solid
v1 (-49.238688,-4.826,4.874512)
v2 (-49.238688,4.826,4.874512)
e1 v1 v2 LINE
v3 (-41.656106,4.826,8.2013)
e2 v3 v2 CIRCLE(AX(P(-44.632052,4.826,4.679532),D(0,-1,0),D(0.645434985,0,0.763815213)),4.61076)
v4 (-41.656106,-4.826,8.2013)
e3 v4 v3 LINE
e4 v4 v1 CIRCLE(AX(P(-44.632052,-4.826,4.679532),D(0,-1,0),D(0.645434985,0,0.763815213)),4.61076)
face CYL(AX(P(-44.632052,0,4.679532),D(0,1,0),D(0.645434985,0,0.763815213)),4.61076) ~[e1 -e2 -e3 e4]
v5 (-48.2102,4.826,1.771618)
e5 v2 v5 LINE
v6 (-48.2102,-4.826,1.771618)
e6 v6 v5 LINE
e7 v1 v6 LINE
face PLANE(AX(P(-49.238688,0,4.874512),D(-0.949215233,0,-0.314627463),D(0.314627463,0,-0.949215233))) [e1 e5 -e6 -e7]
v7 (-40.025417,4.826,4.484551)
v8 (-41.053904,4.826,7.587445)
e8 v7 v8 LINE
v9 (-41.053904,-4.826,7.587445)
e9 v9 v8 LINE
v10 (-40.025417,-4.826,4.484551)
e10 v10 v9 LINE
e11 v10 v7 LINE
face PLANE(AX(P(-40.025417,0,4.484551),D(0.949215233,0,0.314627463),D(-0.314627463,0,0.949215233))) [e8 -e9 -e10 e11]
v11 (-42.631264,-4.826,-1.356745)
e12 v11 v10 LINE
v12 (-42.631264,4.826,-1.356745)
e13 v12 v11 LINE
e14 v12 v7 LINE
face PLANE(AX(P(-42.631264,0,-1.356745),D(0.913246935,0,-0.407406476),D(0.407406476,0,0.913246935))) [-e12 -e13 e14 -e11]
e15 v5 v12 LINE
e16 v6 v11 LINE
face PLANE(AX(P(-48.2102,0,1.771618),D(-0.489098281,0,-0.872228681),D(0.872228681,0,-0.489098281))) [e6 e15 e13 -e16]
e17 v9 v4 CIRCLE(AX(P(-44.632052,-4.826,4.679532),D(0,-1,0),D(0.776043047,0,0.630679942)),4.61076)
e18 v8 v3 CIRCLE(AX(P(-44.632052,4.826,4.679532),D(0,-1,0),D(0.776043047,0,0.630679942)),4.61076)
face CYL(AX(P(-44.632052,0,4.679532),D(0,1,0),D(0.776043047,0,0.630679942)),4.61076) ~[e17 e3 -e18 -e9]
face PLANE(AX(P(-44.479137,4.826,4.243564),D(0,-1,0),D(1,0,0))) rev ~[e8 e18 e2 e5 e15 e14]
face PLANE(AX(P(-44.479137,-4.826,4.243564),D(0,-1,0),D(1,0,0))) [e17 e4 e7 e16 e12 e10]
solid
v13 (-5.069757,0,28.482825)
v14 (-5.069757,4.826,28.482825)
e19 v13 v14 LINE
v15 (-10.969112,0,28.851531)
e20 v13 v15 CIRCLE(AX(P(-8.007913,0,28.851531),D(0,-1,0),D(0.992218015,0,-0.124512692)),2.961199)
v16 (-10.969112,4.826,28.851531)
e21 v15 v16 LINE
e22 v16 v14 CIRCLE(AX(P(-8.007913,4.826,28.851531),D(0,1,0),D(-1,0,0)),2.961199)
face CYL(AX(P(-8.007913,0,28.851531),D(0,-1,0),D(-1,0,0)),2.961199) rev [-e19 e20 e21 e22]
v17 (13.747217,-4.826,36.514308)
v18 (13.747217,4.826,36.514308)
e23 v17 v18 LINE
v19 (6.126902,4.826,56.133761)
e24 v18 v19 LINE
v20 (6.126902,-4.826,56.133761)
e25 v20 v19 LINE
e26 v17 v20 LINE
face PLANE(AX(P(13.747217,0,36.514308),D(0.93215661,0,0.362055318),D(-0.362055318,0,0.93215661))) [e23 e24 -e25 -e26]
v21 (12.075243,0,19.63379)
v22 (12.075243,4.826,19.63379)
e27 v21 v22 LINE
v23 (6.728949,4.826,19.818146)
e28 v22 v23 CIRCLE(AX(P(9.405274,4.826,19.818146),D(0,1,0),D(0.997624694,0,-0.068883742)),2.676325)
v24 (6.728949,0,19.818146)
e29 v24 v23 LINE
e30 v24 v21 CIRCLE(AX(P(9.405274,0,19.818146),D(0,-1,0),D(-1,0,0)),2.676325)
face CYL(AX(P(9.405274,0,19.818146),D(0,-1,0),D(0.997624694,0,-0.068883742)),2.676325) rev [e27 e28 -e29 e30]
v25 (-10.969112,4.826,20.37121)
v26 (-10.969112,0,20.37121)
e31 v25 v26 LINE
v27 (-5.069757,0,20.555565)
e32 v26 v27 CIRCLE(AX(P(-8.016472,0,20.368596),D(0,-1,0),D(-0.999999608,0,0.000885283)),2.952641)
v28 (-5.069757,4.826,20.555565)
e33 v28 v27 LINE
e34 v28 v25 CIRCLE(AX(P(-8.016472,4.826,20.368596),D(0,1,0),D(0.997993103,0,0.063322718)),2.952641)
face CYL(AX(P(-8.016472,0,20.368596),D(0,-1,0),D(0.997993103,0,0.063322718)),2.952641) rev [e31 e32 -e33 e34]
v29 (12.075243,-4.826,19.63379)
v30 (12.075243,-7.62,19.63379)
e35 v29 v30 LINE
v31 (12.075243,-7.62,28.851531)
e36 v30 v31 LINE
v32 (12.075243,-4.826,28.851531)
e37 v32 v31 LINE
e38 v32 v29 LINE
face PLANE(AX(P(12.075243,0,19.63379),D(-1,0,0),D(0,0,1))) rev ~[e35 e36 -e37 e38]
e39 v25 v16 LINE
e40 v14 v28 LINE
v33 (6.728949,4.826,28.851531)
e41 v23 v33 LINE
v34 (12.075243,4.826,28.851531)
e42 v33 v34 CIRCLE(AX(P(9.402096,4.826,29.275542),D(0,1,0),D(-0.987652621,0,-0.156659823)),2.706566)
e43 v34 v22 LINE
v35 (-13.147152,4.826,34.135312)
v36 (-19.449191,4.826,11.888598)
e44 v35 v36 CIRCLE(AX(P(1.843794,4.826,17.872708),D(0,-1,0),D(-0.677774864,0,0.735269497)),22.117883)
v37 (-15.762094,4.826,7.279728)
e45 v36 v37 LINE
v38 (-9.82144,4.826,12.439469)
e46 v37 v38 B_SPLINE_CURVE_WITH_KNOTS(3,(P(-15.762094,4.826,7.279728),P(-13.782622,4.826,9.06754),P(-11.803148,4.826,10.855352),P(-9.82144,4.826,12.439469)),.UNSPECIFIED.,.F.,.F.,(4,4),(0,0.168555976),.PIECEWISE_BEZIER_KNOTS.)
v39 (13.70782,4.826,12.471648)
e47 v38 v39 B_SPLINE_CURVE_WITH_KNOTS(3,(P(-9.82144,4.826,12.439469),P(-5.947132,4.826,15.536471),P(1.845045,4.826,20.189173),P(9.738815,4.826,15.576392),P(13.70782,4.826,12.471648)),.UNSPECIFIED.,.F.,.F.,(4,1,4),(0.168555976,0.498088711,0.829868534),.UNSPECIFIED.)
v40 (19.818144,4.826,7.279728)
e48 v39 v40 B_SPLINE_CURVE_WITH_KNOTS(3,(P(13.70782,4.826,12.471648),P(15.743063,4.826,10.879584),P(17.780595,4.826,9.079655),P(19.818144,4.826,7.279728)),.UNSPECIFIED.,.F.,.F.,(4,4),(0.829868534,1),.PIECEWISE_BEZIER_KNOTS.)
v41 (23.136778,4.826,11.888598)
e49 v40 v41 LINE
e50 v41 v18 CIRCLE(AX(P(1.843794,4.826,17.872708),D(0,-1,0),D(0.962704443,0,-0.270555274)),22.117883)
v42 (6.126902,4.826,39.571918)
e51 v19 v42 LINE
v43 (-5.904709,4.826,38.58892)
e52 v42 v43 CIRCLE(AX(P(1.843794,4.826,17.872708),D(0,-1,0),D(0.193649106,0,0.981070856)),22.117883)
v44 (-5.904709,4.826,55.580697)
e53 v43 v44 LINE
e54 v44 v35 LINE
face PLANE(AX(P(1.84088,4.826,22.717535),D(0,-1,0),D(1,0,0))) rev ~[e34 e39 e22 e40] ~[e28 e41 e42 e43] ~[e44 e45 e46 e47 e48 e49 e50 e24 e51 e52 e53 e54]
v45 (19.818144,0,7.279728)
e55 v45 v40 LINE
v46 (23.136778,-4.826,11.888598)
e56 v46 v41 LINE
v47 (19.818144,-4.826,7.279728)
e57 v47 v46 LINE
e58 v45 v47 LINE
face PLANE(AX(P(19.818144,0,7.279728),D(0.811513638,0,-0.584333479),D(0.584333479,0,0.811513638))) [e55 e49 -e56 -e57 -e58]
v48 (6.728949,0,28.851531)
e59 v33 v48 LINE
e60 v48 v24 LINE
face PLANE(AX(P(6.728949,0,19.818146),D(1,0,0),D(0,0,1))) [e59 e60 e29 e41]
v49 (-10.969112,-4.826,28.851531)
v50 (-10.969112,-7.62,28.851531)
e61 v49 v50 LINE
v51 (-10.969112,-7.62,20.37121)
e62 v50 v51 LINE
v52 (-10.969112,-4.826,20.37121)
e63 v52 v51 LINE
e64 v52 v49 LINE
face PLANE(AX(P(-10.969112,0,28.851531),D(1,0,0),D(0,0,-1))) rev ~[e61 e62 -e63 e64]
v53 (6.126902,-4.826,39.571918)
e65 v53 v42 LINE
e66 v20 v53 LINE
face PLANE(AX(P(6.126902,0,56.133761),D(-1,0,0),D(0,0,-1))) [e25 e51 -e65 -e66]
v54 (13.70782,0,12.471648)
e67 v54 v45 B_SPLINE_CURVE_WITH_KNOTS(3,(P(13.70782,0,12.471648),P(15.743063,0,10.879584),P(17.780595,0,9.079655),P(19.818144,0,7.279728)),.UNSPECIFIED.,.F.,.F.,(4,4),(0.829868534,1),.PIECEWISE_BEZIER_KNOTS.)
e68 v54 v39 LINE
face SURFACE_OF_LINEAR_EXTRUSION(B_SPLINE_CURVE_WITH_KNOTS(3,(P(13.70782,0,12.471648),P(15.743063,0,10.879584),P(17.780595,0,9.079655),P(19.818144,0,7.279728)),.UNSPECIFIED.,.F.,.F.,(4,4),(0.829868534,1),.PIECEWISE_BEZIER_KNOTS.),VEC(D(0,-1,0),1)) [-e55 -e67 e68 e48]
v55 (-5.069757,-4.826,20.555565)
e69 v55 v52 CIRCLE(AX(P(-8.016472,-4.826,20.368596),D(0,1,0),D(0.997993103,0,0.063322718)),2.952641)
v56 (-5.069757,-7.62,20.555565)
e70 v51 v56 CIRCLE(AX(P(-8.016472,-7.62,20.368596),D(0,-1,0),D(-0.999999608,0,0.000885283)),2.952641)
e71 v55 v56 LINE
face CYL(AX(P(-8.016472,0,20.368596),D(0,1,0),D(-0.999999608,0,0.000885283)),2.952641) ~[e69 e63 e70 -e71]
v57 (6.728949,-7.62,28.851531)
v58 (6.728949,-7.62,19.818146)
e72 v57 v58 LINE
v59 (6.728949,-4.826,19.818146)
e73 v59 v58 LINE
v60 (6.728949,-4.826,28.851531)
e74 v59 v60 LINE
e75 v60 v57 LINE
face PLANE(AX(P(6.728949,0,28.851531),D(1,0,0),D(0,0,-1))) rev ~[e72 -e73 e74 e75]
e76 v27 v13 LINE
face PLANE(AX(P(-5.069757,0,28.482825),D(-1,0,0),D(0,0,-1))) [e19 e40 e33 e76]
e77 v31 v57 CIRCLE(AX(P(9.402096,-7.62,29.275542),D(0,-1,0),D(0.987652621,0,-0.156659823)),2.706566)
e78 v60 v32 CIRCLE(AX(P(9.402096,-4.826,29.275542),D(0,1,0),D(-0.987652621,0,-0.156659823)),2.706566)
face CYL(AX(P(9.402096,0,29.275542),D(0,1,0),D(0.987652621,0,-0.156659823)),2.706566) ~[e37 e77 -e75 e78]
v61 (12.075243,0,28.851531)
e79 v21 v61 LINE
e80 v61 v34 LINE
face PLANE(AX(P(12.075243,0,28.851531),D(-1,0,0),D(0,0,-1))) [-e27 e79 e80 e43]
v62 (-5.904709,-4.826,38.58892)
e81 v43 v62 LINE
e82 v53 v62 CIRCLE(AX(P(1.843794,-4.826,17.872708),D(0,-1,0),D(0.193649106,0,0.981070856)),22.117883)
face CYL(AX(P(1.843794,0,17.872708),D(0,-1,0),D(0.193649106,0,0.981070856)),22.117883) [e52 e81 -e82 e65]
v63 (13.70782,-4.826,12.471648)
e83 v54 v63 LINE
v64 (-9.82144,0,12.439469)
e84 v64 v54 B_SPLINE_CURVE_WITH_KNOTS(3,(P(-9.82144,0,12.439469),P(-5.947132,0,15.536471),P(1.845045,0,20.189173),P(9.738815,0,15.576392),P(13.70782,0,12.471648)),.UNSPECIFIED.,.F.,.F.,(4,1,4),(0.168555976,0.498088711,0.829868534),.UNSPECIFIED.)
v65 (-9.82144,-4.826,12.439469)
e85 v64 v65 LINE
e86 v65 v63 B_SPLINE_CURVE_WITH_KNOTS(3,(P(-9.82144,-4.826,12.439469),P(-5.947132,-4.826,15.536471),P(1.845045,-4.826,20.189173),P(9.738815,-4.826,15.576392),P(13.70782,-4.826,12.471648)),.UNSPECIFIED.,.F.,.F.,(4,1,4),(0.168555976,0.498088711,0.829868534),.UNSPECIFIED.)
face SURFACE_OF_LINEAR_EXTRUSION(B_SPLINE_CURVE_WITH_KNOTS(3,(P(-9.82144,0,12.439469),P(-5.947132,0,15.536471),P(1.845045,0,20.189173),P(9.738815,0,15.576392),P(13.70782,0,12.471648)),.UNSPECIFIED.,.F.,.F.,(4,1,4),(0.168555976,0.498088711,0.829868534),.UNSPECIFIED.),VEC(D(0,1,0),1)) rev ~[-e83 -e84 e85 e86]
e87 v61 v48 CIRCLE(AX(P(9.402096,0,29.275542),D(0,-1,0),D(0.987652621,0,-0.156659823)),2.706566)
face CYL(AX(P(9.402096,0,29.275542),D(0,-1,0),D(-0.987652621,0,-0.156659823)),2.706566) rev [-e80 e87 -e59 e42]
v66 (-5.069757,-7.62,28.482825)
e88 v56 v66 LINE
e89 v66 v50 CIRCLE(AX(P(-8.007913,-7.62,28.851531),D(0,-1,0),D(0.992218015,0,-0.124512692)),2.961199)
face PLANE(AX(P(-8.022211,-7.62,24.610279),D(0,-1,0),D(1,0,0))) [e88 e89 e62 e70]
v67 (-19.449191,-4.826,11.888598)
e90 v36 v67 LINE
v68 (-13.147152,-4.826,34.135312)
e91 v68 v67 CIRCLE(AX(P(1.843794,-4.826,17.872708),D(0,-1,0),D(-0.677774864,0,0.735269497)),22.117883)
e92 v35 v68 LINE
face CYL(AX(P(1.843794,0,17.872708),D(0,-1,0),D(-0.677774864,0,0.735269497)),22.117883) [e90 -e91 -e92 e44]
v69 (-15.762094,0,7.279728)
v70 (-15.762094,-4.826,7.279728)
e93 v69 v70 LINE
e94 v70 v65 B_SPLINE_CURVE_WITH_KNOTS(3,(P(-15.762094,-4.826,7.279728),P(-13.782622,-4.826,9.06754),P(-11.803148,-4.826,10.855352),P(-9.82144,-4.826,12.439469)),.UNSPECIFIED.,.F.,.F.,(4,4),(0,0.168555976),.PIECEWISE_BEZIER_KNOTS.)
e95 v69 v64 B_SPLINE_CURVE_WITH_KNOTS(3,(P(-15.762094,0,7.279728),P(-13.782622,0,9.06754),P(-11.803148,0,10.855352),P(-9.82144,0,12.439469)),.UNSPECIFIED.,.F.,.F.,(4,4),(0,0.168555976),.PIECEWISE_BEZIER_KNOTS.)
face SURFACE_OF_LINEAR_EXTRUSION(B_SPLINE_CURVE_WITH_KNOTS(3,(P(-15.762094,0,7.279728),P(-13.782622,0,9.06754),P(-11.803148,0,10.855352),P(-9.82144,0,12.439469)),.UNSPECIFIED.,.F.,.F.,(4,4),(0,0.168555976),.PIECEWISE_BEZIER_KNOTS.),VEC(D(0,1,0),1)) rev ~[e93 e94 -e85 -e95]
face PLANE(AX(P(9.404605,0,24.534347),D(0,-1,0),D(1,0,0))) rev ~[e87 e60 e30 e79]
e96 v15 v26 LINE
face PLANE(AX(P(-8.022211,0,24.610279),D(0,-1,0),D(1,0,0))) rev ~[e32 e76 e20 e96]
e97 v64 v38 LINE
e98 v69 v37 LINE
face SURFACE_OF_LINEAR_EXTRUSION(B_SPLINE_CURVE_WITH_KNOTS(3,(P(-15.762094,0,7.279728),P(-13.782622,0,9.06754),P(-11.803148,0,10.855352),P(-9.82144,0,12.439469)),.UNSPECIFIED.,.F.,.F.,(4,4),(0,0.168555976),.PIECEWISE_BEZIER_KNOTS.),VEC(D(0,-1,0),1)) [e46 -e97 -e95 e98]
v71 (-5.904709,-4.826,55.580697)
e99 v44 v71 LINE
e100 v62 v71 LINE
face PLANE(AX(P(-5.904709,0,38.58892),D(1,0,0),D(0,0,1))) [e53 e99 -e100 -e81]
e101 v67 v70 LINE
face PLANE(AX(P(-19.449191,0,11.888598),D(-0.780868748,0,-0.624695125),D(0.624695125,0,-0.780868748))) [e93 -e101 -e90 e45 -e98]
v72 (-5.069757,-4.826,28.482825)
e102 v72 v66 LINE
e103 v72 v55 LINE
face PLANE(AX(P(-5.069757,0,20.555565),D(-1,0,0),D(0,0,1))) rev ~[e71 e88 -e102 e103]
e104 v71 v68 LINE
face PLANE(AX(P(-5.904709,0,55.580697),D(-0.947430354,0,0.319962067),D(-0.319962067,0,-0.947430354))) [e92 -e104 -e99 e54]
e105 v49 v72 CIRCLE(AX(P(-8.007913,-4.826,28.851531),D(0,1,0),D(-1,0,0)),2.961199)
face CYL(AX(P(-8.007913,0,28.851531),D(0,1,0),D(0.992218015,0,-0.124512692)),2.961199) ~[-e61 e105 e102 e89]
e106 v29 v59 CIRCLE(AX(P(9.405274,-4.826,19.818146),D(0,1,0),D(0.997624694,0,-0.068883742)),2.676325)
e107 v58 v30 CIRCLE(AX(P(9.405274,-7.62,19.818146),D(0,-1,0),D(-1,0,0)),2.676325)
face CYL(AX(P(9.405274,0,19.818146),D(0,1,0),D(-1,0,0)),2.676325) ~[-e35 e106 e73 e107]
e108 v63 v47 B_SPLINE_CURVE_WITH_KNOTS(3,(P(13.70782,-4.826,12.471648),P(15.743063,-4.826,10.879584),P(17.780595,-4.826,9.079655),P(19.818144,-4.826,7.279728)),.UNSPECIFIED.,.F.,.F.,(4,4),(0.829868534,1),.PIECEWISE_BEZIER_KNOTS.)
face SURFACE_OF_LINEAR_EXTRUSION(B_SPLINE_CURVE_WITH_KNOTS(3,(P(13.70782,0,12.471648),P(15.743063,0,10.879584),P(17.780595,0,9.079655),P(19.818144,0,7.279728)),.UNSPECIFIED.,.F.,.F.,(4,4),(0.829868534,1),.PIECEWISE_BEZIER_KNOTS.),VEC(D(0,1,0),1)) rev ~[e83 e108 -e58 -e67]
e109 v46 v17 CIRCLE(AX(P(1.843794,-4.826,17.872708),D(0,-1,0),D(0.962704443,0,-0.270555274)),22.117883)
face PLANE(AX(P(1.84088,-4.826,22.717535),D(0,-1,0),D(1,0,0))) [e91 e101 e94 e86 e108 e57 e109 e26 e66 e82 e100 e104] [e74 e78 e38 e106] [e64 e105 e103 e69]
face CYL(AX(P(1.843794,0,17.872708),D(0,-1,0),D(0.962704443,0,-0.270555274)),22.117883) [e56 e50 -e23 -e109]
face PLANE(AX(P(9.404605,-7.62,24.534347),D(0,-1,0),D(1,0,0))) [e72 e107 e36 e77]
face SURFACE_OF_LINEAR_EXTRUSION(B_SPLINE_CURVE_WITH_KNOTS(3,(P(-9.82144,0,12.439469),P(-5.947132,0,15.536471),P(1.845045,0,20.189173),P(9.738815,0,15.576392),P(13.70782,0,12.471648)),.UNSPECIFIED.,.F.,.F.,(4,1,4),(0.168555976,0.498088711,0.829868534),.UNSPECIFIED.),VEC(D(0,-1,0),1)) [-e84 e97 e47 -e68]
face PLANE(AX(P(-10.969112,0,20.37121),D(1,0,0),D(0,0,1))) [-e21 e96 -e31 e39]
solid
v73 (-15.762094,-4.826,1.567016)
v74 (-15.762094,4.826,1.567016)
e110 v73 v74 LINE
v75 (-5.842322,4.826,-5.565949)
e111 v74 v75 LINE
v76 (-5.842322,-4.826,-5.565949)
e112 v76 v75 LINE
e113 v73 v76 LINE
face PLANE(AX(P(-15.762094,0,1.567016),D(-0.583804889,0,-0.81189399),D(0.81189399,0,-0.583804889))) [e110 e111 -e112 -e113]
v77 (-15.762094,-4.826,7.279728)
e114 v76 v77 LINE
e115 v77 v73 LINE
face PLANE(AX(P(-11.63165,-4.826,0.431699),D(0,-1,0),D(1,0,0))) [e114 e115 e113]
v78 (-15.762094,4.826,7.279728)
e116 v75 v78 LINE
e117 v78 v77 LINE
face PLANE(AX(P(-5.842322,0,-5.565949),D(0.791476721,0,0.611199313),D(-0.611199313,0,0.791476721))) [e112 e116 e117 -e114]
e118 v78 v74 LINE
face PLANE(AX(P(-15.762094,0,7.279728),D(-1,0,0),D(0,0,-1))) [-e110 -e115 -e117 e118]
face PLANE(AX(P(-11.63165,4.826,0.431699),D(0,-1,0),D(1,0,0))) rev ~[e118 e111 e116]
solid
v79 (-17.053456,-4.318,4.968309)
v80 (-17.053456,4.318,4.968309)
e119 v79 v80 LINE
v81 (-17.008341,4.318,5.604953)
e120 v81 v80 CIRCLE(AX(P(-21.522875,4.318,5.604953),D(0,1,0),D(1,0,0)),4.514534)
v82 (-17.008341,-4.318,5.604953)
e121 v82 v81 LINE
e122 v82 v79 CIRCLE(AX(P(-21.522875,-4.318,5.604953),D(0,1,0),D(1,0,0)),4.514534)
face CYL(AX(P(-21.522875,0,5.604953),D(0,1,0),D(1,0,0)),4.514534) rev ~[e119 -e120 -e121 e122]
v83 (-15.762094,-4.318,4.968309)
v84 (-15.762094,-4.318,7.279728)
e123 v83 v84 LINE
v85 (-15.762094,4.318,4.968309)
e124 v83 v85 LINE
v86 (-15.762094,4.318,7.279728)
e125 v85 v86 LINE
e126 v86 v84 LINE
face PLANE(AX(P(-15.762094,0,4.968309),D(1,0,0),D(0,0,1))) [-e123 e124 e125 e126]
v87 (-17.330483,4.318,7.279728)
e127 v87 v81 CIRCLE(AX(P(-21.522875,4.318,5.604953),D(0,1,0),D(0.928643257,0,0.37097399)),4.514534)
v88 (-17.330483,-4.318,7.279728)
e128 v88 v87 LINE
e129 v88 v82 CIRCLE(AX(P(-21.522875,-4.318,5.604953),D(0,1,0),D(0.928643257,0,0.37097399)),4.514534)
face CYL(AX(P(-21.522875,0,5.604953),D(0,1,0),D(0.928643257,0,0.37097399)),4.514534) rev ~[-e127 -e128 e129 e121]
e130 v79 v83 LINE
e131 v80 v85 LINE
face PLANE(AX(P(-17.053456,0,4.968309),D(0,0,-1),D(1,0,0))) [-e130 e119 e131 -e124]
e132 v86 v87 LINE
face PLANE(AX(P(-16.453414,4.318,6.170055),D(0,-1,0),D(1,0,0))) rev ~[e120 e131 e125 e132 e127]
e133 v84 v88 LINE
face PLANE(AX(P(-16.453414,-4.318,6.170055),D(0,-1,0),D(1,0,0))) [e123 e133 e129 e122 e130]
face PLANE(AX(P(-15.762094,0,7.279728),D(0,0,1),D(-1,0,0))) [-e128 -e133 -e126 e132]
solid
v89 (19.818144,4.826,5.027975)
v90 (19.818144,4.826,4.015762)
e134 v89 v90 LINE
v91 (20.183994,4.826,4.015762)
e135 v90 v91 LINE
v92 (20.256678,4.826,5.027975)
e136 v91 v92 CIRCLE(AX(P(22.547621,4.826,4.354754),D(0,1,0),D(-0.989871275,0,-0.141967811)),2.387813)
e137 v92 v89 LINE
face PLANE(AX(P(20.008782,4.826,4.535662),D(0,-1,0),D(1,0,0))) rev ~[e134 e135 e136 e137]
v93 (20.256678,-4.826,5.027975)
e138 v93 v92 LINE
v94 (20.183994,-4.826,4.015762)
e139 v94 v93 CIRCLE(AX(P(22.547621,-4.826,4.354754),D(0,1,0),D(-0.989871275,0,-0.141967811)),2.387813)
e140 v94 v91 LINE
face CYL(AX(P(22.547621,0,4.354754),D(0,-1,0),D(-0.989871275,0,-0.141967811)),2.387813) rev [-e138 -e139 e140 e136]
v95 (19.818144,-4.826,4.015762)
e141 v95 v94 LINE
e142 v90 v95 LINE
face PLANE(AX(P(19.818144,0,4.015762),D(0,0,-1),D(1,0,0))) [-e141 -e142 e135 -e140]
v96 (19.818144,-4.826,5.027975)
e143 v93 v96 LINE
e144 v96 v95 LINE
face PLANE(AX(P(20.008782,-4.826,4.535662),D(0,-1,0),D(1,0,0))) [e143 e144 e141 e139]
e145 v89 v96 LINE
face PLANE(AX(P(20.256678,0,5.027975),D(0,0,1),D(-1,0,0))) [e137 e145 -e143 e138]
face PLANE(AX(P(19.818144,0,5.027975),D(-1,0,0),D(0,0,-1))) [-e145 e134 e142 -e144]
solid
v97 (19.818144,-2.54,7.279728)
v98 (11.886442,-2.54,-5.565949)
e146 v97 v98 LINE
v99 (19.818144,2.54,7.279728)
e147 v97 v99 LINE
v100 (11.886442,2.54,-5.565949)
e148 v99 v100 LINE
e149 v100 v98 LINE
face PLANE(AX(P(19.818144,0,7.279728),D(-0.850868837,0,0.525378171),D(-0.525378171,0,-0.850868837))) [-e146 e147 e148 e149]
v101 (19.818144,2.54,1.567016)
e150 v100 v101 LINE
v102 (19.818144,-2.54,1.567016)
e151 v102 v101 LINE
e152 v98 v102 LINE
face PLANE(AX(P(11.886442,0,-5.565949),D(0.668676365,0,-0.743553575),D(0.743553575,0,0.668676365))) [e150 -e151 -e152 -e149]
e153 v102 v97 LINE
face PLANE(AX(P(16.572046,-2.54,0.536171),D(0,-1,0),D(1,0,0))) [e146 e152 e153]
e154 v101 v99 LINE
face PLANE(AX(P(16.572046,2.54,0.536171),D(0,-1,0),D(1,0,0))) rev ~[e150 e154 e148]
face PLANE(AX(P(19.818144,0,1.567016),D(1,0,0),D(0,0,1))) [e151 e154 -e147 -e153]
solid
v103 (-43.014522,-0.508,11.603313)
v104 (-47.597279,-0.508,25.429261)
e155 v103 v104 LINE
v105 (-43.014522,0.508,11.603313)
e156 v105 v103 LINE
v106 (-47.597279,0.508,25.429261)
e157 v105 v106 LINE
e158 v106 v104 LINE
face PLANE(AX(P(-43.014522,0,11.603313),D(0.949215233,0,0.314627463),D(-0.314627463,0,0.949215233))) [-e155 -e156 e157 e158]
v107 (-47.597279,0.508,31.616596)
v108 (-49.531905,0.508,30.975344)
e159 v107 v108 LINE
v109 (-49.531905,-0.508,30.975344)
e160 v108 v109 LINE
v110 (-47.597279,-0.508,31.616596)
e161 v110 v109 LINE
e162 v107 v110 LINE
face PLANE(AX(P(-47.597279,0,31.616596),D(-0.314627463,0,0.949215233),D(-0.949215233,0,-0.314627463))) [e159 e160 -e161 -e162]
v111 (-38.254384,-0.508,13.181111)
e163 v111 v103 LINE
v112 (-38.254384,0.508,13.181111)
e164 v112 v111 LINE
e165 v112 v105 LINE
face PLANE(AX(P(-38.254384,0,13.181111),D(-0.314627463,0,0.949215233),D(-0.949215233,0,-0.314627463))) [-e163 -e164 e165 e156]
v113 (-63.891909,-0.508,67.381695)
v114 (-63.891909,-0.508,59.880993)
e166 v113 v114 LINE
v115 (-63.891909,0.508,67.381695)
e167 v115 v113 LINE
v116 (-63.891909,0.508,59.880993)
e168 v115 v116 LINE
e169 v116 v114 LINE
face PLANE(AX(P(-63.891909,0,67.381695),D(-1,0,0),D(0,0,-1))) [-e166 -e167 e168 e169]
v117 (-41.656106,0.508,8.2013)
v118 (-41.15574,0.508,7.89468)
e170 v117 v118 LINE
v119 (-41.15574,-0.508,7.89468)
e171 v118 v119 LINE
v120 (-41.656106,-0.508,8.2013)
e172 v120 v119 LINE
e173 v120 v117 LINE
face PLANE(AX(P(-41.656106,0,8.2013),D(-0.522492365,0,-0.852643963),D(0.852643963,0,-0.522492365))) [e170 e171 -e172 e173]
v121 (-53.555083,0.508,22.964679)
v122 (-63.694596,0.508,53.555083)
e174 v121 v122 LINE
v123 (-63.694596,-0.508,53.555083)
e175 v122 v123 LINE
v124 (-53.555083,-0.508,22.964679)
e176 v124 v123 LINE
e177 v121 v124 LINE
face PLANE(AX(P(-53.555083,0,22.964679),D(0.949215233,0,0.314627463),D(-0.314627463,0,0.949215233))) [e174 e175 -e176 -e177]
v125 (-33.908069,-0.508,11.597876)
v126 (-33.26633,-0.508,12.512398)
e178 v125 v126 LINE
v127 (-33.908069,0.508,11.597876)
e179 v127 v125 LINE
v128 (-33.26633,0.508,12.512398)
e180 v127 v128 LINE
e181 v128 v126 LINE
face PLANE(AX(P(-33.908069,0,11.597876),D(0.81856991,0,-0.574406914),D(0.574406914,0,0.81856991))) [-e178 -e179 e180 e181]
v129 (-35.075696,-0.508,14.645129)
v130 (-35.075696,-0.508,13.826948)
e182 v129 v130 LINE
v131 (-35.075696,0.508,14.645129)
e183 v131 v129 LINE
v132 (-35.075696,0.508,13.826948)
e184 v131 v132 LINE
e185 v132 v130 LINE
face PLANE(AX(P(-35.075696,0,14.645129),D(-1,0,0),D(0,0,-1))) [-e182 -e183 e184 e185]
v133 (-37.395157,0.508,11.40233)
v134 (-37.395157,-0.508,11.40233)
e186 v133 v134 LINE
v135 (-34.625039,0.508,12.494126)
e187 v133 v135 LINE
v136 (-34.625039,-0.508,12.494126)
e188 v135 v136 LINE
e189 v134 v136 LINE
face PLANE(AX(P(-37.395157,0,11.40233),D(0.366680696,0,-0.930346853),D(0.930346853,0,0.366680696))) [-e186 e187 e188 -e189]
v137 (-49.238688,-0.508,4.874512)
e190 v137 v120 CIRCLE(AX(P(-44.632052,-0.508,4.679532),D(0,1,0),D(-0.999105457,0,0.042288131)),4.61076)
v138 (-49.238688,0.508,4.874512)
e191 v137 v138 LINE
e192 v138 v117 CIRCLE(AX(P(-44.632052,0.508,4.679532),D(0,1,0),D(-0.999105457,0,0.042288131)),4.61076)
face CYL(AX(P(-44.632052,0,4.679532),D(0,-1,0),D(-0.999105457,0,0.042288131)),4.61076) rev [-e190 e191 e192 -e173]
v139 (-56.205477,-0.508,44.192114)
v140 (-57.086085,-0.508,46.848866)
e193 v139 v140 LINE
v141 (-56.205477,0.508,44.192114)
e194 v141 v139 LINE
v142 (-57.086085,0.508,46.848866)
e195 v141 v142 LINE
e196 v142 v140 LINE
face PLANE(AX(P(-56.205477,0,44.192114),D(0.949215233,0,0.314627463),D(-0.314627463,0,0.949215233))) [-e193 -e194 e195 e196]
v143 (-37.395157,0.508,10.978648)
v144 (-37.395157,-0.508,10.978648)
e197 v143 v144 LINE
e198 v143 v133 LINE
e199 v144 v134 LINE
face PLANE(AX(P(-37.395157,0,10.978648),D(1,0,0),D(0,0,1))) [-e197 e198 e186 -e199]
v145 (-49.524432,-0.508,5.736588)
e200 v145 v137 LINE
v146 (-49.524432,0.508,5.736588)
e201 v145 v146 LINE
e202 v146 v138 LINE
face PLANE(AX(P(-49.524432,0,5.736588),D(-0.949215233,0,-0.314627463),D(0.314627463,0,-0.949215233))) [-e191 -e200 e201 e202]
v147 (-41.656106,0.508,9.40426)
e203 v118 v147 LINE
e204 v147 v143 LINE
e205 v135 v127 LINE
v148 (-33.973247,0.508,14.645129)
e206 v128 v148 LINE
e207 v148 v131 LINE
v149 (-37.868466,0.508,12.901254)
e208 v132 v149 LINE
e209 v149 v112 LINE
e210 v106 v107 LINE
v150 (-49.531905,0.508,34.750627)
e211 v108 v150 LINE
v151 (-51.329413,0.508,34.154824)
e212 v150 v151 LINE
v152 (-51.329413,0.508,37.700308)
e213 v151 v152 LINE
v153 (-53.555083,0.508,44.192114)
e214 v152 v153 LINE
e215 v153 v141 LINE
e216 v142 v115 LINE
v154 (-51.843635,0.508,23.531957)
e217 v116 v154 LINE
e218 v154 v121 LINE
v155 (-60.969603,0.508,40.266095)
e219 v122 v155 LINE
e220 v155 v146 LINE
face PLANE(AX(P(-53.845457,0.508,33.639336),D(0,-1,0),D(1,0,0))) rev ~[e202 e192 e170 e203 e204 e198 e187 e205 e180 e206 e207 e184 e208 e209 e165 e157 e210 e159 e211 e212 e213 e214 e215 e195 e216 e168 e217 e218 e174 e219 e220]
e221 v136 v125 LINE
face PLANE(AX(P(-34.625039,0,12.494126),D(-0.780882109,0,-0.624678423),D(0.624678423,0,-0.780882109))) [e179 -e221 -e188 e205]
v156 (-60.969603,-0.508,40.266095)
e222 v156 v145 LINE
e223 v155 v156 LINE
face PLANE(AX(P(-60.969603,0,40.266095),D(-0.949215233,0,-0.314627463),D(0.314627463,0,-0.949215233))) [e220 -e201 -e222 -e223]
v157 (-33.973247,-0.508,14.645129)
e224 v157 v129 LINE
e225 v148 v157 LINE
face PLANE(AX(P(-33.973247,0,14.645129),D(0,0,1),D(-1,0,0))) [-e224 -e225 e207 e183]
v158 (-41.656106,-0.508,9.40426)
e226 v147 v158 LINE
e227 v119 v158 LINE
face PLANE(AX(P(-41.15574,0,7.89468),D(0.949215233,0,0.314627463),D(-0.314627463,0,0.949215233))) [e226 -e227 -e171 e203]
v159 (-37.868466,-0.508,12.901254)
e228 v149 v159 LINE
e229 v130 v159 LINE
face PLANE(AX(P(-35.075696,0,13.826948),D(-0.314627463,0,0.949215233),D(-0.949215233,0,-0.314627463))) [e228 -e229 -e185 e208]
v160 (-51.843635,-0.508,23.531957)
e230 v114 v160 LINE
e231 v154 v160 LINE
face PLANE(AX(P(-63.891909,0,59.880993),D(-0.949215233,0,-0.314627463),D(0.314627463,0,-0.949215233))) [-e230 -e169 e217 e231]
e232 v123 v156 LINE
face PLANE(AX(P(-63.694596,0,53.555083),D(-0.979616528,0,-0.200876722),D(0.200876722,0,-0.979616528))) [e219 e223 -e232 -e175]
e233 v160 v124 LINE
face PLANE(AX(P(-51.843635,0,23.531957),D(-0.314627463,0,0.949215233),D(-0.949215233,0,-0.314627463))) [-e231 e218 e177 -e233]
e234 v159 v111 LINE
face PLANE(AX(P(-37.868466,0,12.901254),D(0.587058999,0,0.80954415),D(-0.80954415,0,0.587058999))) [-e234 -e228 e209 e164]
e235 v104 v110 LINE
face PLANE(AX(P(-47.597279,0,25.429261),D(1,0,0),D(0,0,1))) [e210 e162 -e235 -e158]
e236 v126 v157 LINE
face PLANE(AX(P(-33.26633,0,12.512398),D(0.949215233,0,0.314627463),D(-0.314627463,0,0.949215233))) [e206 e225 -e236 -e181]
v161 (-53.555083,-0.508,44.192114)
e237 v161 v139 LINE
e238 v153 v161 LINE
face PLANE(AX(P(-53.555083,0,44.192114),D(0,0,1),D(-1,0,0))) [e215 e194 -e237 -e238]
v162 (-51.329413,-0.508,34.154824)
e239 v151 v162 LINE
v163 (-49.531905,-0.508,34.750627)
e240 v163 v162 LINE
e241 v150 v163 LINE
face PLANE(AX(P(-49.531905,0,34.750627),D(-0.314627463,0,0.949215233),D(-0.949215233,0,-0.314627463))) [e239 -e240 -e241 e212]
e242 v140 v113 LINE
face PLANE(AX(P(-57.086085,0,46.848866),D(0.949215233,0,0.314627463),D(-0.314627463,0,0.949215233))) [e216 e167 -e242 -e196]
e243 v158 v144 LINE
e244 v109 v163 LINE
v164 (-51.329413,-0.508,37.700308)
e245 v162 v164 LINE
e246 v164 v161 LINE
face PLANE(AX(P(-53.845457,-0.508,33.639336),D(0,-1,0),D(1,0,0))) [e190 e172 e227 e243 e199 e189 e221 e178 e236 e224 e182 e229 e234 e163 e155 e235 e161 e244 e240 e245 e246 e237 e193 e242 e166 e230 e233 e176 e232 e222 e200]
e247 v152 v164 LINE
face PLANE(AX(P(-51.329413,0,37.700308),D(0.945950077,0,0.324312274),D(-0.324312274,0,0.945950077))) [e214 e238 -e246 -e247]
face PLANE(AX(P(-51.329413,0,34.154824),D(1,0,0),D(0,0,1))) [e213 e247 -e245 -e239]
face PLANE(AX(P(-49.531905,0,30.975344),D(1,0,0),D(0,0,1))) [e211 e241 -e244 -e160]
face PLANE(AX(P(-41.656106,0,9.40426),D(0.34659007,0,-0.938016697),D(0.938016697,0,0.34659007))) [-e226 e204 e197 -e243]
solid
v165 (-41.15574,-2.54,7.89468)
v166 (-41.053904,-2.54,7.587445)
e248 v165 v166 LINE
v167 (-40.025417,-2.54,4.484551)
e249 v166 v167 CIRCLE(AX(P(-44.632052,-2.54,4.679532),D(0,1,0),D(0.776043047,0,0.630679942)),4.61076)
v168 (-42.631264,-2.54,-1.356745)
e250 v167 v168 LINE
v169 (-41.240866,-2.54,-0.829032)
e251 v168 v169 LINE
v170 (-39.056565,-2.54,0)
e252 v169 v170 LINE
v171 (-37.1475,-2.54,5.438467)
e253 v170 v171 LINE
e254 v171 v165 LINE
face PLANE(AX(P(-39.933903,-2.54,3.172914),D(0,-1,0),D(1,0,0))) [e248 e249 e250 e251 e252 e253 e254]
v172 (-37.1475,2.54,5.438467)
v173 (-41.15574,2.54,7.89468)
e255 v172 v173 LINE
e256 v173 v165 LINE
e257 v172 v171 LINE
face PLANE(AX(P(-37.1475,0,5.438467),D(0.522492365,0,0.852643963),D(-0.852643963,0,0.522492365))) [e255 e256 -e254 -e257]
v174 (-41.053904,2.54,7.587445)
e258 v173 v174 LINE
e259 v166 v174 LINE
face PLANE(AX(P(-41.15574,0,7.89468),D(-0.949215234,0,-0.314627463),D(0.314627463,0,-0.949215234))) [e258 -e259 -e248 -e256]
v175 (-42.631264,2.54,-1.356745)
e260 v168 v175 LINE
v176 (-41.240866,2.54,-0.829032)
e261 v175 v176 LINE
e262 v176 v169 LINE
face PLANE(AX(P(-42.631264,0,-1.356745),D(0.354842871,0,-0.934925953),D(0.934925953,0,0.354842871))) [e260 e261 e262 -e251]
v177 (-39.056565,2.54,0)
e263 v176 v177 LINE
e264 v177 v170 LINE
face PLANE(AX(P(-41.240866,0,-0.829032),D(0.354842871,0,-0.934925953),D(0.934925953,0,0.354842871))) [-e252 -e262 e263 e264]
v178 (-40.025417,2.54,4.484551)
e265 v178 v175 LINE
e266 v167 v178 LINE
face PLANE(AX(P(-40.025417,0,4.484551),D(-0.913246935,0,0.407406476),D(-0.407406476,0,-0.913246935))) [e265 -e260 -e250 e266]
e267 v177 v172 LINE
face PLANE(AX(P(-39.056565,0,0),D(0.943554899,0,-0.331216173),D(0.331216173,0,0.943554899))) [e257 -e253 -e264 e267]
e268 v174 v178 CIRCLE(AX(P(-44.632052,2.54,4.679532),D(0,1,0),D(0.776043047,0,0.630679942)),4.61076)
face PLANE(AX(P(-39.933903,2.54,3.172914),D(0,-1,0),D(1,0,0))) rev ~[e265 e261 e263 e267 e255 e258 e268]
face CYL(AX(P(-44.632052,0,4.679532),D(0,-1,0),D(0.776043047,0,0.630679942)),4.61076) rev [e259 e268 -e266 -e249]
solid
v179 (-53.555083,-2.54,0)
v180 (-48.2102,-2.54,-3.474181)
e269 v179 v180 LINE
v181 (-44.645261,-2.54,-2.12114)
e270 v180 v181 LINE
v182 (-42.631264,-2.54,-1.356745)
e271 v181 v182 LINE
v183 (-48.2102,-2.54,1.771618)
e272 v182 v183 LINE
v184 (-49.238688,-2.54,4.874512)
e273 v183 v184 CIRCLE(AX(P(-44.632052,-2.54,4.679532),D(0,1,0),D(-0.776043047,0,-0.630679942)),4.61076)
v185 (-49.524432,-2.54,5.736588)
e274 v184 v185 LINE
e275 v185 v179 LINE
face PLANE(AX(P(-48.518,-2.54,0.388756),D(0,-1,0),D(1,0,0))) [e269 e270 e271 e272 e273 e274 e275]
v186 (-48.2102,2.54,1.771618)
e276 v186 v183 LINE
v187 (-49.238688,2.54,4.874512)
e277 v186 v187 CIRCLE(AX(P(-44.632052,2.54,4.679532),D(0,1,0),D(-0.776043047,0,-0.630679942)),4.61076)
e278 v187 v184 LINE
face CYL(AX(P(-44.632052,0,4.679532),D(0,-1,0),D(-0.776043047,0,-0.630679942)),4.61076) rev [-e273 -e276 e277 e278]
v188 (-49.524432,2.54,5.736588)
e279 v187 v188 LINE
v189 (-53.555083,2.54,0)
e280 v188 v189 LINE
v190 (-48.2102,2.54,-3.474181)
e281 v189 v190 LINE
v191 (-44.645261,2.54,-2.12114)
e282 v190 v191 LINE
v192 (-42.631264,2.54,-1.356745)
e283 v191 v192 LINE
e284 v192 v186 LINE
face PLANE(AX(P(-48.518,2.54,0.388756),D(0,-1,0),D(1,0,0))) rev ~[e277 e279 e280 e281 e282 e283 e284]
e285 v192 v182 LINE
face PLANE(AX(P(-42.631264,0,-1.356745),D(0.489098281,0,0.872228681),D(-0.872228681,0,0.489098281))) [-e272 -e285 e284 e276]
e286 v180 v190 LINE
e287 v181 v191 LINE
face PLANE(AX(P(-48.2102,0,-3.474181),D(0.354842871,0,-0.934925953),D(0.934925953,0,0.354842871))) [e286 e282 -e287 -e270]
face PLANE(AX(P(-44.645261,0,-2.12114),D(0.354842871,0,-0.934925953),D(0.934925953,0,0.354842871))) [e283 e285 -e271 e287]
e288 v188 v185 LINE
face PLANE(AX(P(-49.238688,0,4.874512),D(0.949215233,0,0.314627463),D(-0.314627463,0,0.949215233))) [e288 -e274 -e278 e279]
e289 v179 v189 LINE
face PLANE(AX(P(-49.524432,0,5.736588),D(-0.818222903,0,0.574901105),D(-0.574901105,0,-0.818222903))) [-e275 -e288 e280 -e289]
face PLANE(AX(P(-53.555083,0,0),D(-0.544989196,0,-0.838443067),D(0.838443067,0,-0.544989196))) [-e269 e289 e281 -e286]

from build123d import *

# Parameters (mm, degrees)
F1_DEPTH = 4.826
F2_DEPTH = 2.54
F3_DEPTH = 4.318
F4_DEPTH = 0.508
F5_DEPTH = 7.62


# Not quite as in the source:
# - a feature names something its author has since deleted; it is built from what else it names


with BuildPart() as f1:
    # F0 (on Front) → F1 (new body, symmetric)
    with BuildSketch(Plane.XZ):
        with BuildLine():
            Line((-19.4491906807, 11.888597546), (-15.762093921, 7.2797275278))
            add(Edge.make_bspline(
                [(-15.762093921, 7.2797275278), (-13.7826219563, 9.0675403506), (-11.8031481855, 10.8553523876), (-9.8214397399, 12.4394689606)],
                knots=[0, 0, 0, 0, 0.1685559759, 0.1685559759, 0.1685559759, 0.1685559759], degree=3))
            add(Edge.make_bspline(
                [(-9.8214397399, 12.4394689606), (-5.9471315119, 15.5364713912), (1.8450447155, 20.1891726215), (9.7388153599, 15.5763916719), (13.7078197829, 12.4716475158)],
                knots=[0.1685559759, 0.1685559759, 0.1685559759, 0.1685559759, 0.4980887111, 0.8298685344, 0.8298685344, 0.8298685344, 0.8298685344], degree=3))
            add(Edge.make_bspline(
                [(13.7078197829, 12.4716475158), (15.7430627116, 10.8795836338), (17.780595361, 9.0796552071), (19.8181439191, 7.2797275278)],
                knots=[0.8298685344, 0.8298685344, 0.8298685344, 0.8298685344, 1, 1, 1, 1], degree=3))
            Line((19.8181439191, 7.2797275278), (23.1367782905, 11.888597546))
            ThreePointArc((23.1367782905, 11.888597546), (22.5103556775, 25.7526809049), (13.747217288, 36.5143080234))
            ThreePointArc((13.747217288, 36.5143080234), (10.0801885199, 38.3998252427), (6.1269021237, 39.571918174))
            ThreePointArc((6.1269021237, 39.571918174), (0.0427353837, 39.9171387541), (-5.9047092104, 38.5889200339))
            ThreePointArc((-5.9047092104, 38.5889200339), (-9.7419423832, 36.7133942622), (-13.1471515298, 34.135312415))
            ThreePointArc((-13.1471515298, 34.135312415), (-19.4367130362, 23.9010396945), (-19.4491906807, 11.888597546))
        make_face()
        with BuildLine():
            ThreePointArc((-5.0697573461, 20.5555651337), (-7.9242470393, 17.4173960024), (-10.9691116959, 20.37120983))
            Line((-10.9691116959, 20.37120983), (-10.9691116959, 28.851531446))
            ThreePointArc((-10.9691116959, 28.851531446), (-7.8231993673, 31.8069640078), (-5.0697573461, 28.482824564))
            Line((-5.0697573461, 28.482824564), (-5.0697573461, 20.5555651337))
        make_face(mode=Mode.SUBTRACT)
        with BuildLine():
            ThreePointArc((6.7289490253, 28.851531446), (9.4020958059, 31.9821073356), (12.0752425864, 28.851531446))
            Line((12.0752425864, 28.851531446), (12.0752425864, 19.6337904781))
            ThreePointArc((12.0752425864, 19.6337904781), (9.3130419135, 17.1434102004), (6.7289490253, 19.8181457818))
            Line((6.7289490253, 19.8181457818), (6.7289490253, 28.851531446))
        make_face(mode=Mode.SUBTRACT)
        with BuildLine():
            Line((6.1269021237, 56.1337606095), (6.1269021237, 39.571918174))
            ThreePointArc((6.1269021237, 39.571918174), (10.0801885199, 38.3998252427), (13.747217288, 36.5143080234))
            Line((13.747217288, 36.5143080234), (6.1269021237, 56.1337606095))
        make_face()
        with BuildLine():
            Line((-5.9047092104, 55.5806973326), (-13.1471515298, 34.135312415))
            ThreePointArc((-13.1471515298, 34.135312415), (-9.7419423832, 36.7133942622), (-5.9047092104, 38.5889200339))
            Line((-5.9047092104, 38.5889200339), (-5.9047092104, 55.5806973326))
        make_face()
    extrude(amount=F1_DEPTH, both=True)

    # F0 (on Front) → F5 (join)
    with BuildSketch(Plane.XZ):
        with BuildLine():
            Line((-10.9691116959, 28.851531446), (-10.9691116959, 20.37120983))
            ThreePointArc((-10.9691116959, 20.37120983), (-7.9242470393, 17.4173960024), (-5.0697573461, 20.5555651337))
            Line((-5.0697573461, 20.5555651337), (-5.0697573461, 28.482824564))
            ThreePointArc((-5.0697573461, 28.482824564), (-7.8231993673, 31.8069640078), (-10.9691116959, 28.851531446))
        make_face()
        with BuildLine():
            Line((12.0752425864, 19.6337904781), (12.0752425864, 28.851531446))
            ThreePointArc((12.0752425864, 28.851531446), (9.4020958059, 31.9821073356), (6.7289490253, 28.851531446))
            Line((6.7289490253, 28.851531446), (6.7289490253, 19.8181457818))
            ThreePointArc((6.7289490253, 19.8181457818), (9.3130419135, 17.1434102004), (12.0752425864, 19.6337904781))
        make_face()
    extrude(amount=F5_DEPTH)


with BuildPart() as f1b:
    # F0 (on Front) → F1, piece 2 (new body, symmetric)
    with BuildSketch(Plane.XZ):
        with BuildLine():
            Line((20.256677791, 5.0279753847), (19.8181439191, 5.0279753847))
            Line((19.8181439191, 5.0279753847), (19.8181439191, 4.0157617505))
            Line((19.8181439191, 4.0157617505), (20.1839942505, 4.0157617505))
            ThreePointArc((20.1839942505, 4.0157617505), (20.1659410394, 4.525774482), (20.256677791, 5.0279753847))
        make_face()
    extrude(amount=F1_DEPTH, both=True)


with BuildPart() as f1c:
    # F0 (on Front) → F1, piece 3 (new body, symmetric)
    with BuildSketch(Plane.XZ):
        Polygon((-5.842322018, -5.5659487844), (-15.762093921, 7.2797275278), (-15.762093921, 4.9683086441), (-15.762093921, 1.5670161229), align=None)
    extrude(amount=F1_DEPTH, both=True)


with BuildPart() as f1d:
    # F0 (on Front) → F1, piece 4 (new body, symmetric)
    with BuildSketch(Plane.XZ):
        with BuildLine():
            Line((-48.2102003072, 1.7716179376), (-42.6312641226, -1.3567452536))
            Line((-42.6312641226, -1.3567452536), (-40.025416848, 4.4845512796))
            Line((-40.025416848, 4.4845512796), (-41.0539040545, 7.5874454587))
            ThreePointArc((-41.0539040545, 7.5874454587), (-41.3406632708, 7.908442582), (-41.6561064599, 8.2013002196))
            ThreePointArc((-41.6561064599, 8.2013002196), (-46.4845280708, 8.9017869639), (-49.2386875136, 4.8745121166))
            Line((-49.2386875136, 4.8745121166), (-48.2102003072, 1.7716179376))
        make_face()
    extrude(amount=F1_DEPTH, both=True)


with BuildPart() as f2:
    # F0 (on Front) → F2 (new body, symmetric)
    with BuildSketch(Plane.XZ):
        Polygon((19.8181439191, 7.2797275278), (11.8864420801, -5.5659487844), (19.8181439191, 1.5670161229), (19.8181439191, 4.0157617505), (19.8181439191, 5.0279753847), align=None)
    extrude(amount=F2_DEPTH, both=True)


with BuildPart() as f2b:
    # F0 (on Front) → F2, piece 2 (new body, symmetric)
    with BuildSketch(Plane.XZ):
        with BuildLine():
            Line((-44.6452607465, -2.1211398475), (-42.6312641226, -1.3567452536))
            Line((-42.6312641226, -1.3567452536), (-48.2102003072, 1.7716179376))
            ThreePointArc((-48.2102003072, 1.7716179376), (-49.0086556744, 3.2288600216), (-49.2386875136, 4.8745121166))
            Line((-49.2386875136, 4.8745121166), (-49.5244317276, 5.7365880401))
            Line((-49.5244317276, 5.7365880401), (-53.5550825298, 0))
            Line((-53.5550825298, 0), (-48.2102003072, -3.4741811065))
            Line((-48.2102003072, -3.4741811065), (-44.6452607465, -2.1211398475))
        make_face()
    extrude(amount=F2_DEPTH, both=True)


with BuildPart() as f2c:
    # F0 (on Front) → F2, piece 3 (new body, symmetric)
    with BuildSketch(Plane.XZ):
        with BuildLine():
            Line((-42.6312641226, -1.3567452536), (-41.2408662619, -0.8290320512))
            Line((-41.2408662619, -0.8290320512), (-39.0565654234, 0))
            Line((-39.0565654234, 0), (-37.1474996209, 5.4384674877))
            Line((-37.1474996209, 5.4384674877), (-41.1557403652, 7.8946804868))
            Line((-41.1557403652, 7.8946804868), (-41.0539040545, 7.5874454587))
            ThreePointArc((-41.0539040545, 7.5874454587), (-40.2554486873, 6.1302033746), (-40.025416848, 4.4845512796))
            Line((-40.025416848, 4.4845512796), (-42.6312641226, -1.3567452536))
        make_face()
    extrude(amount=F2_DEPTH, both=True)


with BuildPart() as f3:
    # F0 (on Front) → F3 (new body, symmetric)
    with BuildSketch(Plane.XZ):
        with BuildLine():
            Line((-15.762093921, 4.9683086441), (-15.762093921, 7.2797275278))
            Line((-15.762093921, 7.2797275278), (-17.3304833915, 7.2797275278))
            ThreePointArc((-17.3304833915, 7.2797275278), (-17.0896080002, 6.4576904492), (-17.0083409329, 5.6049527542))
            ThreePointArc((-17.0083409329, 5.6049527542), (-17.0196339379, 5.2858324269), (-17.0534564546, 4.9683086441))
            Line((-17.0534564546, 4.9683086441), (-15.762093921, 4.9683086441))
        make_face()
    extrude(amount=F3_DEPTH, both=True)


with BuildPart() as f4:
    # F0 (on Front) → F4 (new body, symmetric)
    with BuildSketch(Plane.XZ):
        with BuildLine():
            Line((-41.6561064599, 8.2013002196), (-41.1557403652, 7.8946804868))
            Line((-41.1557403652, 7.8946804868), (-41.6561064599, 9.4042598309))
            Line((-41.6561064599, 9.4042598309), (-37.39515692, 10.978648439))
            Line((-37.39515692, 10.978648439), (-37.39515692, 11.4023303613))
            Line((-37.39515692, 11.4023303613), (-34.6250385046, 12.4941263348))
            Line((-34.6250385046, 12.4941263348), (-33.9080691338, 11.5978755057))
            Line((-33.9080691338, 11.5978755057), (-33.2663303501, 12.5123980251))
            Line((-33.2663303501, 12.5123980251), (-33.9732468128, 14.6451294422))
            Line((-33.9732468128, 14.6451294422), (-35.0756955059, 14.6451294422))
            Line((-35.0756955059, 14.6451294422), (-35.0756955059, 13.8269480115))
            Line((-35.0756955059, 13.8269480115), (-37.8684664491, 12.9012544429))
            Line((-37.8684664491, 12.9012544429), (-38.2543841723, 13.1811112886))
            Line((-38.2543841723, 13.1811112886), (-43.0145218035, 11.6033131517))
            Line((-43.0145218035, 11.6033131517), (-47.5972788614, 25.4292607277))
            Line((-47.5972788614, 25.4292607277), (-47.5972788614, 31.6165960183))
            Line((-47.5972788614, 31.6165960183), (-49.5319052912, 30.9753435561))
            Line((-49.5319052912, 30.9753435561), (-49.5319052912, 34.7506268671))
            Line((-49.5319052912, 34.7506268671), (-51.329412806, 34.1548239244))
            Line((-51.329412806, 34.1548239244), (-51.329412806, 37.700308))
            Line((-51.329412806, 37.700308), (-53.5550825298, 44.1921142478))
            Line((-53.5550825298, 44.1921142478), (-56.2054766065, 44.1921142478))
            Line((-56.2054766065, 44.1921142478), (-57.0860852852, 46.8488663453))
            Line((-57.0860852852, 46.8488663453), (-63.8919092274, 67.3816949129))
            Line((-63.8919092274, 67.3816949129), (-63.8919092274, 59.8809927873))
            Line((-63.8919092274, 59.8809927873), (-51.8436354556, 23.5319567276))
            Line((-51.8436354556, 23.5319567276), (-53.5550825298, 22.9646794314))
            Line((-53.5550825298, 22.9646794314), (-63.6945962906, 53.5550825298))
            Line((-63.6945962906, 53.5550825298), (-60.9696031492, 40.2660946392))
            Line((-60.9696031492, 40.2660946392), (-49.5244317276, 5.7365880401))
            Line((-49.5244317276, 5.7365880401), (-49.2386875136, 4.8745121166))
            ThreePointArc((-49.2386875136, 4.8745121166), (-46.4845280708, 8.9017869639), (-41.6561064599, 8.2013002196))
        make_face()
    extrude(amount=F4_DEPTH, both=True)


solid = Compound([f1.part, f1b.part, f1c.part, f1d.part, f2.part, f2b.part, f2c.part, f3.part, f4.part])
